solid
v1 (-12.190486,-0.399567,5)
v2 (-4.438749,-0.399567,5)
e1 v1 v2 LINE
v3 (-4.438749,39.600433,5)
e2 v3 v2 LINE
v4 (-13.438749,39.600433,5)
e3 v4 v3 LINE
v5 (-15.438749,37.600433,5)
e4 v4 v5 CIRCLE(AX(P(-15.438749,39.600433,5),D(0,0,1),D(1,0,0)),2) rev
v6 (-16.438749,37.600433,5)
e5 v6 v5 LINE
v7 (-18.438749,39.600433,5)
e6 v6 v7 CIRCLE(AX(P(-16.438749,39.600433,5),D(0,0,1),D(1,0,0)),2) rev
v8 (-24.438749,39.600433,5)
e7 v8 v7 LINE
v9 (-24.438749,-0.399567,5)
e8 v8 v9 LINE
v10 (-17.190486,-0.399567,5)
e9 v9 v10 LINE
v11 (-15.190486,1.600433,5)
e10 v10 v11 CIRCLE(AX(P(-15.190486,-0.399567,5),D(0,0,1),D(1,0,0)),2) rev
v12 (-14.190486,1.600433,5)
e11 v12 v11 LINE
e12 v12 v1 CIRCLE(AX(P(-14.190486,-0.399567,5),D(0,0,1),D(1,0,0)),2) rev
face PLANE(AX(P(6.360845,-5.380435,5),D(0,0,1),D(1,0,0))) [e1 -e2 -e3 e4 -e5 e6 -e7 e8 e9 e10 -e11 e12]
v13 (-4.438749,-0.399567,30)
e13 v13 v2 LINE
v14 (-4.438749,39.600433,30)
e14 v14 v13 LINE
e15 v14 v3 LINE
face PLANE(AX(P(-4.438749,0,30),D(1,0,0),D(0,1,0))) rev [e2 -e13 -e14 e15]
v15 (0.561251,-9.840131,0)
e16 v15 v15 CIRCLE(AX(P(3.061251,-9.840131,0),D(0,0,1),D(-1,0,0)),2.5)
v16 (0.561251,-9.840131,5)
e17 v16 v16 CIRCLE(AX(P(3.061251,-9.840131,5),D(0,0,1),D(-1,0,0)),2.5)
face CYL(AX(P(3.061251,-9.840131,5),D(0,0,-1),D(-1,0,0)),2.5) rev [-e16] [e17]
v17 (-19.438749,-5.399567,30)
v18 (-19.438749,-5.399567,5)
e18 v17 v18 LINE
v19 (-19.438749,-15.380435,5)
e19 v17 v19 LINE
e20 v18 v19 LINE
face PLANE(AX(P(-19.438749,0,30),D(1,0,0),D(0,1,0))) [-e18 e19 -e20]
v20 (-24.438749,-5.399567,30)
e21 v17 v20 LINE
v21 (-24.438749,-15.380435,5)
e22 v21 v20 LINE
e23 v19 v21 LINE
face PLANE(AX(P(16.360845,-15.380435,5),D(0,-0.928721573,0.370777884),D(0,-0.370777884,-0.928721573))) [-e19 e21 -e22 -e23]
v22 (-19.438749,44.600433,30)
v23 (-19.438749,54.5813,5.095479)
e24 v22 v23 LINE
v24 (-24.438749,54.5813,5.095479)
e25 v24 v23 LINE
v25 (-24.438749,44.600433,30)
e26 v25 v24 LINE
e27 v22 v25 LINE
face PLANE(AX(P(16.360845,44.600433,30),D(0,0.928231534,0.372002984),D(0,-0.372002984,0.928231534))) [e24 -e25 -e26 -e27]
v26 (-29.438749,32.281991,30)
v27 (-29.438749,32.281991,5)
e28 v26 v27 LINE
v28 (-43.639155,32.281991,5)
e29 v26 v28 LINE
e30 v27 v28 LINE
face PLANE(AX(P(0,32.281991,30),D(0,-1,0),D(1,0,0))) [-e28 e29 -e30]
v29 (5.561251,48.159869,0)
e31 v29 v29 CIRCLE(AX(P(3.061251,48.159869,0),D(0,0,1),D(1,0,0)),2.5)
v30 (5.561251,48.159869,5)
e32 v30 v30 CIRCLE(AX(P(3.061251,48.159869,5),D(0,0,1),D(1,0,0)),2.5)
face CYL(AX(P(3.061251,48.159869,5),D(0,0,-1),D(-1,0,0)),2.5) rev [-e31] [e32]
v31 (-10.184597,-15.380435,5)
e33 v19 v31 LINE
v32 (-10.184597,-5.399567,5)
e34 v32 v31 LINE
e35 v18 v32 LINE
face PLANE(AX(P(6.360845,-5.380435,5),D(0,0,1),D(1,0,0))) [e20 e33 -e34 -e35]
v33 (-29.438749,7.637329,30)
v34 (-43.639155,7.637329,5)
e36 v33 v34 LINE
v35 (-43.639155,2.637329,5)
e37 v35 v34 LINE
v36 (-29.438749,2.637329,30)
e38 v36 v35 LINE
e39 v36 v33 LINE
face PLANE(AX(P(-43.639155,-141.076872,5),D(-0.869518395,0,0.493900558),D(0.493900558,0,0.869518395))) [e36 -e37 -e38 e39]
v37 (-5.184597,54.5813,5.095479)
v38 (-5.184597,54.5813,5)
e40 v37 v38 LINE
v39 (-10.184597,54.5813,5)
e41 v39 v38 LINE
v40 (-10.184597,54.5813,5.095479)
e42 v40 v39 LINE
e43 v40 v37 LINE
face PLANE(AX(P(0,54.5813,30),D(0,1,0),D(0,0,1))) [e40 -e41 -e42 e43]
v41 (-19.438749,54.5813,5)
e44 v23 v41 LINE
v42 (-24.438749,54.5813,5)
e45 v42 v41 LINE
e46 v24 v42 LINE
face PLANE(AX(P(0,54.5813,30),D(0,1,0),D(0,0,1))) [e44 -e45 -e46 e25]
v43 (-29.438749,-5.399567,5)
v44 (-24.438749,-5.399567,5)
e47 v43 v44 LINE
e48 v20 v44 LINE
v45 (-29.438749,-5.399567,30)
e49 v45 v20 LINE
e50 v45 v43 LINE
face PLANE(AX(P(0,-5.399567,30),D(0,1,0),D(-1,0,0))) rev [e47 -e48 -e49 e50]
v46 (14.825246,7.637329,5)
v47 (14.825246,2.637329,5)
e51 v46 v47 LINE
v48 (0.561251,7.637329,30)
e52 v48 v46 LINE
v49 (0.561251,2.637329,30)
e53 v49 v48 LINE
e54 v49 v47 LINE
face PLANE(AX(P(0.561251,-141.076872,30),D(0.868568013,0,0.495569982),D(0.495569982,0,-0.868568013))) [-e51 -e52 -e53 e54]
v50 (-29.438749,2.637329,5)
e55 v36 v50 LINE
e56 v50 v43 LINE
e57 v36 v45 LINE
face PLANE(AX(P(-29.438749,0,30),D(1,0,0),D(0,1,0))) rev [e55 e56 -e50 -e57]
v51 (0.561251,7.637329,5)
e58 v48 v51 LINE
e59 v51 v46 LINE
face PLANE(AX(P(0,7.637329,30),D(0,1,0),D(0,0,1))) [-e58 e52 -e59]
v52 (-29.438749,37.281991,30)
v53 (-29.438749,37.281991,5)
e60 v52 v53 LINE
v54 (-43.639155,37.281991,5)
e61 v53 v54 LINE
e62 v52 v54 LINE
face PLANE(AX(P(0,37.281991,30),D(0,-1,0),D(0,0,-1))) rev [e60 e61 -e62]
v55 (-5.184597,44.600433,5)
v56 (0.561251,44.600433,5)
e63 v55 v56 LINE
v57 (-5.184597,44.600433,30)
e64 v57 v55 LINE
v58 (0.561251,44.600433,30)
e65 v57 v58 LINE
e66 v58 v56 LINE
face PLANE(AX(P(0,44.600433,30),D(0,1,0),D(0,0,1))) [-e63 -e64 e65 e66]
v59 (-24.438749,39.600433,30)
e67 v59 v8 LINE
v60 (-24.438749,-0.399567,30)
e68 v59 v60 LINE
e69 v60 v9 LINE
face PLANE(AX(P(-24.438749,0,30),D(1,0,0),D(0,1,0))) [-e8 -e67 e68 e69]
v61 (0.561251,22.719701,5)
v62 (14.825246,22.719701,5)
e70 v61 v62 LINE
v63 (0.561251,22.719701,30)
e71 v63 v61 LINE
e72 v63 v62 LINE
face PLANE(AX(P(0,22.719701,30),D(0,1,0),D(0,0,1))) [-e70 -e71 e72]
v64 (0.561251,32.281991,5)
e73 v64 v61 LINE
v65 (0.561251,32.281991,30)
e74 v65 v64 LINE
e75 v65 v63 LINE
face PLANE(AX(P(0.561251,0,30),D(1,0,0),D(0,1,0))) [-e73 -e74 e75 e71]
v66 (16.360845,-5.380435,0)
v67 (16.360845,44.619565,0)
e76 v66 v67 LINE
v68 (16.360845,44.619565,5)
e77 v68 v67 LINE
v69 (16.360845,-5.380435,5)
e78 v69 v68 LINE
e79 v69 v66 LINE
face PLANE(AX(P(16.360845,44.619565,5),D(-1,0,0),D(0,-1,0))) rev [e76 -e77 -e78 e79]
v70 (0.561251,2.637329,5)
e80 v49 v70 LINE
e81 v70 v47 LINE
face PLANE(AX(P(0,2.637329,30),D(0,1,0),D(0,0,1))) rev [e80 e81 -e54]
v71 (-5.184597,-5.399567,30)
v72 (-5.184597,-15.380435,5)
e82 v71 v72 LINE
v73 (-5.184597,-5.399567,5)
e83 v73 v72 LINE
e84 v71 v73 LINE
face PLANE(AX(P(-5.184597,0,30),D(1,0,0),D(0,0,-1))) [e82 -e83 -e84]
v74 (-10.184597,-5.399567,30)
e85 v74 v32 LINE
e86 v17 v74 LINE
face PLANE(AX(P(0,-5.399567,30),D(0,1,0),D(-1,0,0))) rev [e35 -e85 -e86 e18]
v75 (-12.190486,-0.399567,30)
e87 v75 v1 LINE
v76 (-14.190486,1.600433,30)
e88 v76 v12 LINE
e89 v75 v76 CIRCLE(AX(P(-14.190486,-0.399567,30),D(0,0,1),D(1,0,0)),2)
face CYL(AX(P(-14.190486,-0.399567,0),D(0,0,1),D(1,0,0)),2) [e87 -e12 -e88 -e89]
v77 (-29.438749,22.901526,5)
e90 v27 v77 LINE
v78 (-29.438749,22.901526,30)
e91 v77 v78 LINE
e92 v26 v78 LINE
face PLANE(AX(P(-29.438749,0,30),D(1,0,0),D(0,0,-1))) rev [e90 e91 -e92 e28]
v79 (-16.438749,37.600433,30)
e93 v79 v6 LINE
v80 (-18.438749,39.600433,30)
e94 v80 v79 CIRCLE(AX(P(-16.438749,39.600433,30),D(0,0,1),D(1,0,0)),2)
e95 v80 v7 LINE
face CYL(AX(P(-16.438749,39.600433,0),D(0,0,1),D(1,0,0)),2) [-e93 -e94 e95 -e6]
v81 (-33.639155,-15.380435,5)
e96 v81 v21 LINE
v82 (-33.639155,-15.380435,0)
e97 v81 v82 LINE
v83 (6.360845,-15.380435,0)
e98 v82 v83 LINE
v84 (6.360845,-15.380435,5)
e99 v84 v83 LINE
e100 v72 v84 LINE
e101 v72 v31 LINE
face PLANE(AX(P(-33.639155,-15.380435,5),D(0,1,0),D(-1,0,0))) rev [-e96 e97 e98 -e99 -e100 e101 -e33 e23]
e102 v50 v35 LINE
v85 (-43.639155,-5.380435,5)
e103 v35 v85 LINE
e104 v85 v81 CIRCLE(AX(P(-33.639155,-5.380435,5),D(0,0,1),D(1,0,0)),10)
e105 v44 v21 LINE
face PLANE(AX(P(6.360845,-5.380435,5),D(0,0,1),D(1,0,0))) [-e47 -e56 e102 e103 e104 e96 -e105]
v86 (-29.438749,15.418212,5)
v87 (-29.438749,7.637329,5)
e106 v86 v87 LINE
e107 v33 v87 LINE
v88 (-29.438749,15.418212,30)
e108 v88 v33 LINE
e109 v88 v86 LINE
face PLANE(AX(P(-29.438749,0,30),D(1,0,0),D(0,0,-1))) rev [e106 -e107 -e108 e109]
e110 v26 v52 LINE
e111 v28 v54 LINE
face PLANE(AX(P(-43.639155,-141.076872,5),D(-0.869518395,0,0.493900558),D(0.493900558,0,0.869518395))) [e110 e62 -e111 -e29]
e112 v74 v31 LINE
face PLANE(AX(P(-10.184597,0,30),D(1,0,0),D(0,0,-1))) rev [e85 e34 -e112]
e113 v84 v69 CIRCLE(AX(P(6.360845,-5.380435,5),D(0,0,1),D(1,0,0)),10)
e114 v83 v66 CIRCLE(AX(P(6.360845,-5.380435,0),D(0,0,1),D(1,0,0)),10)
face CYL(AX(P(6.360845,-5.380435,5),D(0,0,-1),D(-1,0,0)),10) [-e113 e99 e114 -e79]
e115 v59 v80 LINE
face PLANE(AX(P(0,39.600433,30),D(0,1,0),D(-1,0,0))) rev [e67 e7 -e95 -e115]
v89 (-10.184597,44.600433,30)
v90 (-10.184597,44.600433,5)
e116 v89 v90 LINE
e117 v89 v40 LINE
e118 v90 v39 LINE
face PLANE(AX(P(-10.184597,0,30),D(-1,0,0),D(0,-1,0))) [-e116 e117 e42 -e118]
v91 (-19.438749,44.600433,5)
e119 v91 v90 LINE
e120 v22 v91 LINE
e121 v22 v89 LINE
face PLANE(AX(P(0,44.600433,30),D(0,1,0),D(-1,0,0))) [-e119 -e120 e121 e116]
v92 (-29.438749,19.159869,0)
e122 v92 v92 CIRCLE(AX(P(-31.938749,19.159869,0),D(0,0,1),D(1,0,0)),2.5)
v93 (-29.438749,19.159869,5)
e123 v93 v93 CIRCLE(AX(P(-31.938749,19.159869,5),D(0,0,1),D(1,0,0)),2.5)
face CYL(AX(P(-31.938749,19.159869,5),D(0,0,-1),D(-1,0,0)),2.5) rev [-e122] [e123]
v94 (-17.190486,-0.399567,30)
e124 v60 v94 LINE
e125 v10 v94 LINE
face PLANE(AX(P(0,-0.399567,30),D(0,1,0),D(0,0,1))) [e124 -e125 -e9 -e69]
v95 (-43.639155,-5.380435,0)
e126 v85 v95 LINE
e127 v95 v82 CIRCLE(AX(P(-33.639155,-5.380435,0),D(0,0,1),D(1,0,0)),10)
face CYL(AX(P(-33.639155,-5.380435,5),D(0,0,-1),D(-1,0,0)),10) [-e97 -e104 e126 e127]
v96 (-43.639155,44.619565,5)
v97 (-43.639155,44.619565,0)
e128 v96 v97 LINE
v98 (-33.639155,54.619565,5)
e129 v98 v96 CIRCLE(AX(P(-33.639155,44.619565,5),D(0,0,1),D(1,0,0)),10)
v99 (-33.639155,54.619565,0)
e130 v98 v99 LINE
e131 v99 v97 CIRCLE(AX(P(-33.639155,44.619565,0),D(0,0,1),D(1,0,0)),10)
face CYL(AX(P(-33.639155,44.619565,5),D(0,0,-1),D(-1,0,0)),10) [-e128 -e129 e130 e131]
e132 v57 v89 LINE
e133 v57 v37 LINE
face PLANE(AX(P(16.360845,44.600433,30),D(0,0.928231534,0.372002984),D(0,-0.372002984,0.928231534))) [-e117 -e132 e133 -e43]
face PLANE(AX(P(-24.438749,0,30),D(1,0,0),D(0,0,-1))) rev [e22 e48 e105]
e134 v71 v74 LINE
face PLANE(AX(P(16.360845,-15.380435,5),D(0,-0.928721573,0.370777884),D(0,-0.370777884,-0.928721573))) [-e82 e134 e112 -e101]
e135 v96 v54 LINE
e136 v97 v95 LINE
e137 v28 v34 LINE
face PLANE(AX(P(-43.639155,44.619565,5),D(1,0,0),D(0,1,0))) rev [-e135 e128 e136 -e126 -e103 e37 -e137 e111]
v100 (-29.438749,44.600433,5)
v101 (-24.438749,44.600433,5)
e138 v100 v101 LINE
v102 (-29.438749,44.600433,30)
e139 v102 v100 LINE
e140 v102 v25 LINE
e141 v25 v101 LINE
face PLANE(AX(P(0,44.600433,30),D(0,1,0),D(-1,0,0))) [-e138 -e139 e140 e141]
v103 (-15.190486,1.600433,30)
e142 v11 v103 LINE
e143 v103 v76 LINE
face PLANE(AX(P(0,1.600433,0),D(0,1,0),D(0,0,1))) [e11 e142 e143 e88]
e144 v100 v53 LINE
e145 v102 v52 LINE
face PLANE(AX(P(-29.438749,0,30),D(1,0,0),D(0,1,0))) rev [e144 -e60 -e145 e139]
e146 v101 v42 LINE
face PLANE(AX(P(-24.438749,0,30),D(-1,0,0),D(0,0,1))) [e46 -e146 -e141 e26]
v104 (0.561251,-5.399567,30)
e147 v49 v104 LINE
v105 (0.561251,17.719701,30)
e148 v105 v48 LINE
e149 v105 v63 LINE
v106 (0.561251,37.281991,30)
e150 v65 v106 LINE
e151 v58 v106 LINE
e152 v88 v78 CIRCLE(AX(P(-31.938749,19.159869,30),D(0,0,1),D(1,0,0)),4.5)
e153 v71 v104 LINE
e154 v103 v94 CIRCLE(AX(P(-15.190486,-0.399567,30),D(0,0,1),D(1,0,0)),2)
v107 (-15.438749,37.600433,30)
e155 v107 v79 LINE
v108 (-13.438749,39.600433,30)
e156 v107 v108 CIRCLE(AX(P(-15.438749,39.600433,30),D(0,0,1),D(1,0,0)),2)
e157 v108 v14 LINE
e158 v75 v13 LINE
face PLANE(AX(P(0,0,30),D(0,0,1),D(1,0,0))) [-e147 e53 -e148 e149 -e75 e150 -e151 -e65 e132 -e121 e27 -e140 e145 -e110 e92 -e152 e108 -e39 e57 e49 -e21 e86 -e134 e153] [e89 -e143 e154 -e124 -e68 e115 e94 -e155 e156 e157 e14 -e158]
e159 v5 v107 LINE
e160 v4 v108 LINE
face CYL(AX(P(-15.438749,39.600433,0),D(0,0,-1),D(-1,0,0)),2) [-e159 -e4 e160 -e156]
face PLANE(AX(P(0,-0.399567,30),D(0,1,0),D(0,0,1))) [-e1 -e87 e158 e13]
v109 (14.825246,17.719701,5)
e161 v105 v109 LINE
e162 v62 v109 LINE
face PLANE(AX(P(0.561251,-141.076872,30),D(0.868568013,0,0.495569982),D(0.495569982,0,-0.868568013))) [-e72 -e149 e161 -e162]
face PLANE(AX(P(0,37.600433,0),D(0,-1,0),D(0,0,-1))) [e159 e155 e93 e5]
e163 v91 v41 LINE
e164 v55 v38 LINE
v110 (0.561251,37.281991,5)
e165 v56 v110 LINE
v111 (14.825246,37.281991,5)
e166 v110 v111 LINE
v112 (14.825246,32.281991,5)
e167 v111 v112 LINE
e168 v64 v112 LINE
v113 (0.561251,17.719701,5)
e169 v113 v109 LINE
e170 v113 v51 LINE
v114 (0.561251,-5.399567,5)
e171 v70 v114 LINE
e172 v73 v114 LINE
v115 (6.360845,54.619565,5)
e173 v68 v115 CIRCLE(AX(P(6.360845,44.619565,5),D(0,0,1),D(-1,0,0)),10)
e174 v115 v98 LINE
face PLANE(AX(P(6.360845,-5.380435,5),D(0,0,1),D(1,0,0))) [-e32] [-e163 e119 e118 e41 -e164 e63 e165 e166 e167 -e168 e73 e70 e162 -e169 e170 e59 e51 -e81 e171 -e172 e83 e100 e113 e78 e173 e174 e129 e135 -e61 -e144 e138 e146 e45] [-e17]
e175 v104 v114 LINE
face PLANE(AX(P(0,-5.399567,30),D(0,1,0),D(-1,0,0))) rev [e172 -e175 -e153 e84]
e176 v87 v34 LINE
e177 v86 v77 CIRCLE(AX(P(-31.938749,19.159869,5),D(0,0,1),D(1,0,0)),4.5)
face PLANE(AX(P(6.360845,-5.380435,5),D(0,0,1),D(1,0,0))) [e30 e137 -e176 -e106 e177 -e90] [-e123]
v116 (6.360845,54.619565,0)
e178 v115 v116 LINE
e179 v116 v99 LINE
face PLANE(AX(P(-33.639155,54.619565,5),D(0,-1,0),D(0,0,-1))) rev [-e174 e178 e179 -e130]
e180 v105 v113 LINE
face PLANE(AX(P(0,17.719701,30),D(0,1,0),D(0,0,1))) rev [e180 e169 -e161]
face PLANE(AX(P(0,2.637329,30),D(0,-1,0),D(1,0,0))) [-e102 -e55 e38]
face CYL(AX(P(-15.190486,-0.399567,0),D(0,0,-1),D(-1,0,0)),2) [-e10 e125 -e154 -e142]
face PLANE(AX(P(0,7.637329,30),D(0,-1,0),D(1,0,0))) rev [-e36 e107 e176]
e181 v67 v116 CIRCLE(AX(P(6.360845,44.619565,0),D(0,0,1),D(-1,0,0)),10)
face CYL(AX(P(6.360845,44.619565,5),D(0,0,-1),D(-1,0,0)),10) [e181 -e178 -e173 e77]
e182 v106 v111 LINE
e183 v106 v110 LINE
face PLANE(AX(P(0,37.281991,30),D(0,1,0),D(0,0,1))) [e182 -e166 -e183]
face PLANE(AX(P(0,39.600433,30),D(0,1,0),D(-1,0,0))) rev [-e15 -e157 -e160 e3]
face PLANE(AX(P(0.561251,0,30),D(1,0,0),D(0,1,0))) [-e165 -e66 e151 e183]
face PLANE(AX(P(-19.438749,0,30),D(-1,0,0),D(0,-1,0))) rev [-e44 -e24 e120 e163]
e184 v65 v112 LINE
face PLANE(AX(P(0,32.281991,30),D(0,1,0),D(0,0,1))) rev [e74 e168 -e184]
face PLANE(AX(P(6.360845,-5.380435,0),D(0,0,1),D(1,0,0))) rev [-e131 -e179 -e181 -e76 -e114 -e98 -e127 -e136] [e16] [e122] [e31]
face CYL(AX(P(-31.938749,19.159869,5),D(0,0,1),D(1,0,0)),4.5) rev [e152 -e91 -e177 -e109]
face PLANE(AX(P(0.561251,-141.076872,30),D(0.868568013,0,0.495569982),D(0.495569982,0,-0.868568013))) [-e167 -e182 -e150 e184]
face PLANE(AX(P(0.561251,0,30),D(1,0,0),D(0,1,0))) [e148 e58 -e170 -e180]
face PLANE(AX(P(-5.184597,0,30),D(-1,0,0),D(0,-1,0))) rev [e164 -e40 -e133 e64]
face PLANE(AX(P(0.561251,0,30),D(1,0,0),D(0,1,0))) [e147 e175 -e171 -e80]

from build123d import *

# Parameters (mm, degrees)
SKETCH1_R                = 2.5
BOSS_EXTRUDE1_DEPTH      = 5
SKETCH3_W                = 20
SKETCH3_H                = 40
BOSS_EXTRUDE5_DEPTH      = 25
CUT_EXTRUDE2_DEPTH       = 75.20598847
CUT_EXTRUDE2_DEPTH_BACK  = 75.20598847
CUT_EXTRUDE_THIN13_DEPTH = 75.484252037
SKETCH8_W                = 5
SKETCH8_H                = 25
BOSS_EXTRUDE6_DEPTH      = 2
FILLET3_R                = 2
SKETCH9_W                = 5
SKETCH9_H                = 25
BOSS_EXTRUDE7_DEPTH      = 2
FILLET4_R                = 2
SKETCH11_R               = 4.5
CUT_EXTRUDE4_DEPTH       = 25


with BuildPart() as part:
    # Sketch1 → Boss-Extrude1 (new body)
    with BuildSketch(Plane.XY):
        with BuildLine():
            Line((-33.639154819, 54.619565217), (6.360845181, 54.619565217))
            ThreePointArc((6.360845181, 54.619565217), (13.431912992, 51.690633029), (16.360845181, 44.619565217))
            Line((16.360845181, 44.619565217), (16.360845181, -5.380434783))
            ThreePointArc((16.360845181, -5.380434783), (13.431912992, -12.451502594), (6.360845181, -15.380434783))
            Line((6.360845181, -15.380434783), (-33.639154819, -15.380434783))
            ThreePointArc((-33.639154819, -15.380434783), (-40.710222631, -12.451502594), (-43.639154819, -5.380434783))
            Line((-43.639154819, -5.380434783), (-43.639154819, 44.619565217))
            ThreePointArc((-43.639154819, 44.619565217), (-40.710222631, 51.690633029), (-33.639154819, 54.619565217))
        make_face()
        with Locations((3.061250856, 48.159869042)):
            Circle(SKETCH1_R, mode=Mode.SUBTRACT)
        with Locations(Location((3.061250856, -9.840130958, 0), (0, 0, 180))):
            Circle(SKETCH1_R, mode=Mode.SUBTRACT)
        with Locations((-31.938749144, 19.159869042)):
            Circle(SKETCH1_R, mode=Mode.SUBTRACT)
    extrude(amount=BOSS_EXTRUDE1_DEPTH)

    # Sketch3 → Boss-Extrude5 (add)
    with BuildSketch(Plane.XY.offset(5)):
        Polygon((-24.438749144, 44.600432852), (-29.438749144, 44.600432852), (-29.438749144, 37.28199121), (-43.639154819, 37.28199121), (-43.639154819, 32.28199121), (-29.438749144, 32.28199121), (-29.438749144, 7.637328911), (-43.639154819, 7.637328911), (-43.639154819, 2.637328911), (-29.438749144, 2.637328911), (-29.438749144, -5.399567148), (-24.438749144, -5.399567148), (-24.438749144, -15.380434783), (-19.438749144, -15.380434783), (-19.438749144, -5.399567148), (-10.184597354, -5.399567148), (-10.184597354, -15.380434783), (-5.184597354, -15.380434783), (-5.184597354, -5.399567148), (0.561250856, -5.399567148), (0.561250856, 2.637328911), (14.825245568, 2.637328911), (14.825245568, 7.637328911), (0.561250856, 7.637328911), (0.561250856, 17.719700958), (14.825245568, 17.719700958), (14.825245568, 22.719700958), (0.561250856, 22.719700958), (0.561250856, 32.28199121), (14.825245568, 32.28199121), (14.825245568, 37.28199121), (0.561250856, 37.28199121), (0.561250856, 44.600432852), (-5.184597354, 44.600432852), (-5.184597354, 54.581300487), (-10.184597354, 54.581300487), (-10.184597354, 44.600432852), (-19.438749144, 44.600432852), (-19.438749144, 54.581300487), (-24.438749144, 54.581300487), align=None)
        with Locations((-14.438749144, 19.600432852)):
            Rectangle(SKETCH3_W, SKETCH3_H, mode=Mode.SUBTRACT)
    extrude(amount=BOSS_EXTRUDE5_DEPTH)

    # Sketch5 → Cut-Extrude2 (cut, two sides: drawn at the far end of the back side and taken through both)
    with BuildSketch(Plane.XZ.offset(-2.637328911).offset(-CUT_EXTRUDE2_DEPTH_BACK)):
        Polygon((-43.639154819, 30), (-43.639154819, 5), (-29.438749144, 30), align=None)
        Polygon((14.825245568, 30), (0.561250856, 30), (14.825245568, 5), align=None)
    extrude(amount=CUT_EXTRUDE2_DEPTH + CUT_EXTRUDE2_DEPTH_BACK, mode=Mode.SUBTRACT)

    # Sketch7 → Cut-Extrude-Thin13 (cut, through all)
    with BuildSketch(Plane.ZY.offset(24.438749144)):
        Polygon((30, 44.600432852), (5, 54.619565217), (8.72002984, 63.901880553), (33.72002984, 53.882748188), align=None)
        Polygon((5, -15.380434783), (30, -5.399567148), (33.707778838, -14.686782882), (8.707778838, -24.667650517), align=None)
    extrude(amount=-CUT_EXTRUDE_THIN13_DEPTH, mode=Mode.SUBTRACT)

    # Sketch8 → Boss-Extrude6 (add)
    with BuildSketch(Plane.XZ.offset(-39.600432852)):
        with Locations((-15.938749144, 17.5)):
            Rectangle(SKETCH8_W, SKETCH8_H)
    extrude(amount=BOSS_EXTRUDE6_DEPTH)

    # Fillet3
    fillet3_edges = [part.edges().sort_by_distance(p)[0] for p in [
        (-18.438749144, 37.600432852, 17.5),
        (-13.438749144, 37.600432852, 17.5),
    ]]
    fillet(fillet3_edges, radius=FILLET3_R - 0.0001)  # a hair under: the kernel refuses the full size

    # Sketch9 → Boss-Extrude7 (add)
    with BuildSketch(Plane(origin=(0, -0.399567148, 0), x_dir=(1, 0, 0), z_dir=(0, 1, 0))):
        with Locations((-14.690486301, -17.5)):
            Rectangle(SKETCH9_W, SKETCH9_H)
    extrude(amount=BOSS_EXTRUDE7_DEPTH)

    # Fillet4
    fillet4_edges = [part.edges().sort_by_distance(p)[0] for p in [
        (-12.190486301, 1.600432852, 17.5),
        (-17.190486301, 1.600432852, 17.5),
    ]]
    fillet(fillet4_edges, radius=FILLET4_R - 0.0001)  # a hair under: the kernel refuses the full size

    # Sketch11 → Cut-Extrude4 (cut)
    with BuildSketch(Plane.XY.offset(30)):
        with Locations((-31.938749144, 19.159869042)):
            Circle(SKETCH11_R)
    extrude(amount=-CUT_EXTRUDE4_DEPTH, mode=Mode.SUBTRACT)


solid = part.part
